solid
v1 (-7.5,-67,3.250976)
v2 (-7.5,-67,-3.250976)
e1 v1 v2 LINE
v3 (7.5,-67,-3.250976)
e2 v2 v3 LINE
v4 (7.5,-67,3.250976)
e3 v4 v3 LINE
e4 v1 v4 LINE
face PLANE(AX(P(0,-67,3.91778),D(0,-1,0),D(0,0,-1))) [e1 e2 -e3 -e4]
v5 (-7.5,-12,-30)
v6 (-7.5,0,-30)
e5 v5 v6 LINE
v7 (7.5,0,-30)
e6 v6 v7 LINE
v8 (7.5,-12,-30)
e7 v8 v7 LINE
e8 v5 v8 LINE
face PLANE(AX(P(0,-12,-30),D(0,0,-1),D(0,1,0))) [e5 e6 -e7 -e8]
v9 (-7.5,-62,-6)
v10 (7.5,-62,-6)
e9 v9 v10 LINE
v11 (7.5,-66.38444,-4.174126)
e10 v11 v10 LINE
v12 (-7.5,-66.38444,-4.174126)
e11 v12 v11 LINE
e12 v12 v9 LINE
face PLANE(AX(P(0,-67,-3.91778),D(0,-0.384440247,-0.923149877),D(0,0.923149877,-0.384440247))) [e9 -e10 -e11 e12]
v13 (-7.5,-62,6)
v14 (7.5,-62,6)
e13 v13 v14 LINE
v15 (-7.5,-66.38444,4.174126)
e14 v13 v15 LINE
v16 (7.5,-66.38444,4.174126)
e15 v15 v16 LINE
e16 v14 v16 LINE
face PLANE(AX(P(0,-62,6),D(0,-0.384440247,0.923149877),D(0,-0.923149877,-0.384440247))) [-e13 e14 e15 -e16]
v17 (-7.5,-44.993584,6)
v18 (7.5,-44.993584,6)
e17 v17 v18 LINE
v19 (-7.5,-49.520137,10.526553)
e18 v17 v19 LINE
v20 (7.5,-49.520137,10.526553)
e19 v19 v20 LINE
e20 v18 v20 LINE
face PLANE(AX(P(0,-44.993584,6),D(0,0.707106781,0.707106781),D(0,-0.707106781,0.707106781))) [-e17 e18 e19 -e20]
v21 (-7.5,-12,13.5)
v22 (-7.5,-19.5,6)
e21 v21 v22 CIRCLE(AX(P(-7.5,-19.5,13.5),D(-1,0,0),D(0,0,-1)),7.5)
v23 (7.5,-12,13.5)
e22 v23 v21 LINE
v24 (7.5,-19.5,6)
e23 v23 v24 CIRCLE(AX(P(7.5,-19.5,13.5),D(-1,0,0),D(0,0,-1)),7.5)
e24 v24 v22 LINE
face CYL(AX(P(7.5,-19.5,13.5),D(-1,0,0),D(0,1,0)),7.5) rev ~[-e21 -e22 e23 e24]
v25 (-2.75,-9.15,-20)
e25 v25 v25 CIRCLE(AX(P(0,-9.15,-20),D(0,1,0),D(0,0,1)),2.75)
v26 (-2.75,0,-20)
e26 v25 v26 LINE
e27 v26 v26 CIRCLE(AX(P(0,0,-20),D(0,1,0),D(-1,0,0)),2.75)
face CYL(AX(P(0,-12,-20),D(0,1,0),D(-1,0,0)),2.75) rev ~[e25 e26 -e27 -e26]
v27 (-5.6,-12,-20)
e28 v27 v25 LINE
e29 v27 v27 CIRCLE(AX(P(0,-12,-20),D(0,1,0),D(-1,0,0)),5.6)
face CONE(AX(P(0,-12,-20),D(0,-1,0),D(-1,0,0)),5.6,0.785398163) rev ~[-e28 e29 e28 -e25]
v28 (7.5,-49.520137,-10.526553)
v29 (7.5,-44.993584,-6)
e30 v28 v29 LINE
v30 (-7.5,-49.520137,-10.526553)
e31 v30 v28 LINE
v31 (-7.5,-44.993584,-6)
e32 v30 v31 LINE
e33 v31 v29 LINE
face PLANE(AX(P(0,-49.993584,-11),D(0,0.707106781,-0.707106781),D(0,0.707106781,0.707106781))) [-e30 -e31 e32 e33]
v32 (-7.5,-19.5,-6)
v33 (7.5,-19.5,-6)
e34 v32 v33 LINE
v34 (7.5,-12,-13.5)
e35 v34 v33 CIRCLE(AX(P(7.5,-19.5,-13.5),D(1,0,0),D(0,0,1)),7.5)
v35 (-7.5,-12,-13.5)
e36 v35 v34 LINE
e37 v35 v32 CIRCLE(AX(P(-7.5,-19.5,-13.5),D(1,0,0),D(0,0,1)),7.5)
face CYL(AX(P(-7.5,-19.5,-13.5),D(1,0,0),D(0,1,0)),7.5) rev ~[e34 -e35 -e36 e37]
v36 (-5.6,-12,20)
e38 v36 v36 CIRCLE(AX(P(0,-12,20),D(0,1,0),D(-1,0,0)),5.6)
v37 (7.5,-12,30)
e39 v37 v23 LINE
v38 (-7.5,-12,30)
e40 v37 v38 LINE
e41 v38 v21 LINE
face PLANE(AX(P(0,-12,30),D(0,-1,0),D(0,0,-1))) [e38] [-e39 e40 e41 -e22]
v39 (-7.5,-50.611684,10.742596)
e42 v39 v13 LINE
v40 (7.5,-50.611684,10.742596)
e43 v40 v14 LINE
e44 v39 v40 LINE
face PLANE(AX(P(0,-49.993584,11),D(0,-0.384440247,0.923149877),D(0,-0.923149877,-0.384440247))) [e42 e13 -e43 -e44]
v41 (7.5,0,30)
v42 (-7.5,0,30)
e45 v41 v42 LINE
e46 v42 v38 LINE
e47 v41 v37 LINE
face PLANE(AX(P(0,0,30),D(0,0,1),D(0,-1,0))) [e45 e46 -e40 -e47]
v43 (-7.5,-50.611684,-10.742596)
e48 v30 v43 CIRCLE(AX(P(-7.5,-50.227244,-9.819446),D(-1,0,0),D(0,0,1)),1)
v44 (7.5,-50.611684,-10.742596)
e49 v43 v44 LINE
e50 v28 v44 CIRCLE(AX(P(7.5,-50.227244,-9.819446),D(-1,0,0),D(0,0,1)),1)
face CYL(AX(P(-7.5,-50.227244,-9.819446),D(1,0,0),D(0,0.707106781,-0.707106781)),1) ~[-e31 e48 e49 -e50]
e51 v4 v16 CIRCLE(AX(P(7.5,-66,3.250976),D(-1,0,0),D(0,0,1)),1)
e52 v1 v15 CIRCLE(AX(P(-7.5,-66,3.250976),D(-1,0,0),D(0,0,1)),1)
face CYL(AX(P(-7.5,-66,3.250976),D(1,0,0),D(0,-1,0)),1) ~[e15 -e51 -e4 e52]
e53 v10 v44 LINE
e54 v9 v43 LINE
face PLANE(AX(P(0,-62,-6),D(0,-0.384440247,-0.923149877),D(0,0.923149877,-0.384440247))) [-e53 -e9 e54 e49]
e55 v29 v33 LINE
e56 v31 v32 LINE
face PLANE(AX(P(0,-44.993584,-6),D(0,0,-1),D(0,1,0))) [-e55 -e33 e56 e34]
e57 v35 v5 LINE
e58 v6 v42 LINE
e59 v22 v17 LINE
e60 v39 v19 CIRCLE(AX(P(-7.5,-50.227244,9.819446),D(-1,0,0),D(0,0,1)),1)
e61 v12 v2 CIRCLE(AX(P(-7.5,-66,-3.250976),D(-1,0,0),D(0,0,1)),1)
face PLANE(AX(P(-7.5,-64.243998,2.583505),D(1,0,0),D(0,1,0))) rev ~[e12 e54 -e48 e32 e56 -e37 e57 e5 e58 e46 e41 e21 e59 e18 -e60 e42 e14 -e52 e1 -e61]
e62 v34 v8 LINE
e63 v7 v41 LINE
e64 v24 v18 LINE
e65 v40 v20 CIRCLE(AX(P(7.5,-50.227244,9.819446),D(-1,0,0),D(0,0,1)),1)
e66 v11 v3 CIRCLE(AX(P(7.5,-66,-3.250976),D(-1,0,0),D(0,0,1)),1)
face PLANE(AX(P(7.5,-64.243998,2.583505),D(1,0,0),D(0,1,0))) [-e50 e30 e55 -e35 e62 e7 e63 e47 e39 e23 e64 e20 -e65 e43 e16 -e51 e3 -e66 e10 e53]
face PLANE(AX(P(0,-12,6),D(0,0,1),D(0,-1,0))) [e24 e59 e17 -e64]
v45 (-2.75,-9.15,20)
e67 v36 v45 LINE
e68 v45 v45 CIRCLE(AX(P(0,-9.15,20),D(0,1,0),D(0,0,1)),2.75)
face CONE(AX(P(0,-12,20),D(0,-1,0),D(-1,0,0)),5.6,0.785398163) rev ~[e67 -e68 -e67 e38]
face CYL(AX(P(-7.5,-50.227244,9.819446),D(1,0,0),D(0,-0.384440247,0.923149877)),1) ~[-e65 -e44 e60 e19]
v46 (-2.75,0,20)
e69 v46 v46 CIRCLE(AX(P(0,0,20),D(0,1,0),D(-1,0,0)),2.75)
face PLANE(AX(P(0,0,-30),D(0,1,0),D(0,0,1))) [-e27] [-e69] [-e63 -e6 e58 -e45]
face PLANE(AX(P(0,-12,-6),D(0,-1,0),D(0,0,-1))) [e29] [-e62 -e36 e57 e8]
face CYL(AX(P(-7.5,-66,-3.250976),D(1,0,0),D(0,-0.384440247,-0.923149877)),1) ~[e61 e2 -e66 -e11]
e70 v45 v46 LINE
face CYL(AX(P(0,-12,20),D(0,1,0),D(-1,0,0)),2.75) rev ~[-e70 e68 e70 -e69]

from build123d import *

# Parameters (mm, degrees)
F1_DEPTH       = 7.5
F2_R           = 1
F4_D           = 5.5
F4_CSINK_D     = 11.2
F4_CSINK_ANGLE = 90
F5_R           = 7.5


with BuildPart() as f1:
    # F0 (on Right) → F1 (new body, symmetric)
    with BuildSketch(Plane.YZ):
        Polygon((-67, 0), (-62, 0), (-62, 6), (-67, 3.917779892), align=None)
        Polygon((-62, 6), (-44.9935843937, 6), (-49.9935843937, 11), align=None)
        Polygon((-12, 0), (-12, 6), (-44.9935843937, 6), (-62, 6), (-62, 0), align=None)
        Polygon((-62, -6), (-62, 0), (-67, 0), (-67, -3.917779892), align=None)
        Polygon((-49.9935843937, -11), (-44.9935843937, -6), (-62, -6), align=None)
        Polygon((-12, -6), (-12, 0), (-62, 0), (-62, -6), (-44.9935843937, -6), align=None)
        Polygon((0, 0), (0, 30), (-12, 30), (-12, 6), (-12, 0), align=None)
        Polygon((0, -30), (0, 0), (-12, 0), (-12, -6), (-12, -30), align=None)
    extrude(amount=F1_DEPTH, both=True)

    # F2
    f2_edges = [f1.edges().sort_by_distance(p)[0] for p in [
        (0, -49.993584, 11),
        (0, -67, 3.91778),
        (0, -67, -3.91778),
        (0, -49.993584, -11),
    ]]
    fillet(f2_edges, radius=F2_R)

    # F4 (through all)
    with Locations(Plane.XZ.offset(12)):
        with Locations((0, 20), (0, -20)):
            CounterSinkHole(F4_D / 2, F4_CSINK_D / 2, counter_sink_angle=F4_CSINK_ANGLE)

    # F5
    f5_edges = [f1.edges().sort_by_distance(p)[0] for p in [
        (0, -12, 6),
        (0, -12, -6),
    ]]
    fillet(f5_edges, radius=F5_R)


solid = f1.part
